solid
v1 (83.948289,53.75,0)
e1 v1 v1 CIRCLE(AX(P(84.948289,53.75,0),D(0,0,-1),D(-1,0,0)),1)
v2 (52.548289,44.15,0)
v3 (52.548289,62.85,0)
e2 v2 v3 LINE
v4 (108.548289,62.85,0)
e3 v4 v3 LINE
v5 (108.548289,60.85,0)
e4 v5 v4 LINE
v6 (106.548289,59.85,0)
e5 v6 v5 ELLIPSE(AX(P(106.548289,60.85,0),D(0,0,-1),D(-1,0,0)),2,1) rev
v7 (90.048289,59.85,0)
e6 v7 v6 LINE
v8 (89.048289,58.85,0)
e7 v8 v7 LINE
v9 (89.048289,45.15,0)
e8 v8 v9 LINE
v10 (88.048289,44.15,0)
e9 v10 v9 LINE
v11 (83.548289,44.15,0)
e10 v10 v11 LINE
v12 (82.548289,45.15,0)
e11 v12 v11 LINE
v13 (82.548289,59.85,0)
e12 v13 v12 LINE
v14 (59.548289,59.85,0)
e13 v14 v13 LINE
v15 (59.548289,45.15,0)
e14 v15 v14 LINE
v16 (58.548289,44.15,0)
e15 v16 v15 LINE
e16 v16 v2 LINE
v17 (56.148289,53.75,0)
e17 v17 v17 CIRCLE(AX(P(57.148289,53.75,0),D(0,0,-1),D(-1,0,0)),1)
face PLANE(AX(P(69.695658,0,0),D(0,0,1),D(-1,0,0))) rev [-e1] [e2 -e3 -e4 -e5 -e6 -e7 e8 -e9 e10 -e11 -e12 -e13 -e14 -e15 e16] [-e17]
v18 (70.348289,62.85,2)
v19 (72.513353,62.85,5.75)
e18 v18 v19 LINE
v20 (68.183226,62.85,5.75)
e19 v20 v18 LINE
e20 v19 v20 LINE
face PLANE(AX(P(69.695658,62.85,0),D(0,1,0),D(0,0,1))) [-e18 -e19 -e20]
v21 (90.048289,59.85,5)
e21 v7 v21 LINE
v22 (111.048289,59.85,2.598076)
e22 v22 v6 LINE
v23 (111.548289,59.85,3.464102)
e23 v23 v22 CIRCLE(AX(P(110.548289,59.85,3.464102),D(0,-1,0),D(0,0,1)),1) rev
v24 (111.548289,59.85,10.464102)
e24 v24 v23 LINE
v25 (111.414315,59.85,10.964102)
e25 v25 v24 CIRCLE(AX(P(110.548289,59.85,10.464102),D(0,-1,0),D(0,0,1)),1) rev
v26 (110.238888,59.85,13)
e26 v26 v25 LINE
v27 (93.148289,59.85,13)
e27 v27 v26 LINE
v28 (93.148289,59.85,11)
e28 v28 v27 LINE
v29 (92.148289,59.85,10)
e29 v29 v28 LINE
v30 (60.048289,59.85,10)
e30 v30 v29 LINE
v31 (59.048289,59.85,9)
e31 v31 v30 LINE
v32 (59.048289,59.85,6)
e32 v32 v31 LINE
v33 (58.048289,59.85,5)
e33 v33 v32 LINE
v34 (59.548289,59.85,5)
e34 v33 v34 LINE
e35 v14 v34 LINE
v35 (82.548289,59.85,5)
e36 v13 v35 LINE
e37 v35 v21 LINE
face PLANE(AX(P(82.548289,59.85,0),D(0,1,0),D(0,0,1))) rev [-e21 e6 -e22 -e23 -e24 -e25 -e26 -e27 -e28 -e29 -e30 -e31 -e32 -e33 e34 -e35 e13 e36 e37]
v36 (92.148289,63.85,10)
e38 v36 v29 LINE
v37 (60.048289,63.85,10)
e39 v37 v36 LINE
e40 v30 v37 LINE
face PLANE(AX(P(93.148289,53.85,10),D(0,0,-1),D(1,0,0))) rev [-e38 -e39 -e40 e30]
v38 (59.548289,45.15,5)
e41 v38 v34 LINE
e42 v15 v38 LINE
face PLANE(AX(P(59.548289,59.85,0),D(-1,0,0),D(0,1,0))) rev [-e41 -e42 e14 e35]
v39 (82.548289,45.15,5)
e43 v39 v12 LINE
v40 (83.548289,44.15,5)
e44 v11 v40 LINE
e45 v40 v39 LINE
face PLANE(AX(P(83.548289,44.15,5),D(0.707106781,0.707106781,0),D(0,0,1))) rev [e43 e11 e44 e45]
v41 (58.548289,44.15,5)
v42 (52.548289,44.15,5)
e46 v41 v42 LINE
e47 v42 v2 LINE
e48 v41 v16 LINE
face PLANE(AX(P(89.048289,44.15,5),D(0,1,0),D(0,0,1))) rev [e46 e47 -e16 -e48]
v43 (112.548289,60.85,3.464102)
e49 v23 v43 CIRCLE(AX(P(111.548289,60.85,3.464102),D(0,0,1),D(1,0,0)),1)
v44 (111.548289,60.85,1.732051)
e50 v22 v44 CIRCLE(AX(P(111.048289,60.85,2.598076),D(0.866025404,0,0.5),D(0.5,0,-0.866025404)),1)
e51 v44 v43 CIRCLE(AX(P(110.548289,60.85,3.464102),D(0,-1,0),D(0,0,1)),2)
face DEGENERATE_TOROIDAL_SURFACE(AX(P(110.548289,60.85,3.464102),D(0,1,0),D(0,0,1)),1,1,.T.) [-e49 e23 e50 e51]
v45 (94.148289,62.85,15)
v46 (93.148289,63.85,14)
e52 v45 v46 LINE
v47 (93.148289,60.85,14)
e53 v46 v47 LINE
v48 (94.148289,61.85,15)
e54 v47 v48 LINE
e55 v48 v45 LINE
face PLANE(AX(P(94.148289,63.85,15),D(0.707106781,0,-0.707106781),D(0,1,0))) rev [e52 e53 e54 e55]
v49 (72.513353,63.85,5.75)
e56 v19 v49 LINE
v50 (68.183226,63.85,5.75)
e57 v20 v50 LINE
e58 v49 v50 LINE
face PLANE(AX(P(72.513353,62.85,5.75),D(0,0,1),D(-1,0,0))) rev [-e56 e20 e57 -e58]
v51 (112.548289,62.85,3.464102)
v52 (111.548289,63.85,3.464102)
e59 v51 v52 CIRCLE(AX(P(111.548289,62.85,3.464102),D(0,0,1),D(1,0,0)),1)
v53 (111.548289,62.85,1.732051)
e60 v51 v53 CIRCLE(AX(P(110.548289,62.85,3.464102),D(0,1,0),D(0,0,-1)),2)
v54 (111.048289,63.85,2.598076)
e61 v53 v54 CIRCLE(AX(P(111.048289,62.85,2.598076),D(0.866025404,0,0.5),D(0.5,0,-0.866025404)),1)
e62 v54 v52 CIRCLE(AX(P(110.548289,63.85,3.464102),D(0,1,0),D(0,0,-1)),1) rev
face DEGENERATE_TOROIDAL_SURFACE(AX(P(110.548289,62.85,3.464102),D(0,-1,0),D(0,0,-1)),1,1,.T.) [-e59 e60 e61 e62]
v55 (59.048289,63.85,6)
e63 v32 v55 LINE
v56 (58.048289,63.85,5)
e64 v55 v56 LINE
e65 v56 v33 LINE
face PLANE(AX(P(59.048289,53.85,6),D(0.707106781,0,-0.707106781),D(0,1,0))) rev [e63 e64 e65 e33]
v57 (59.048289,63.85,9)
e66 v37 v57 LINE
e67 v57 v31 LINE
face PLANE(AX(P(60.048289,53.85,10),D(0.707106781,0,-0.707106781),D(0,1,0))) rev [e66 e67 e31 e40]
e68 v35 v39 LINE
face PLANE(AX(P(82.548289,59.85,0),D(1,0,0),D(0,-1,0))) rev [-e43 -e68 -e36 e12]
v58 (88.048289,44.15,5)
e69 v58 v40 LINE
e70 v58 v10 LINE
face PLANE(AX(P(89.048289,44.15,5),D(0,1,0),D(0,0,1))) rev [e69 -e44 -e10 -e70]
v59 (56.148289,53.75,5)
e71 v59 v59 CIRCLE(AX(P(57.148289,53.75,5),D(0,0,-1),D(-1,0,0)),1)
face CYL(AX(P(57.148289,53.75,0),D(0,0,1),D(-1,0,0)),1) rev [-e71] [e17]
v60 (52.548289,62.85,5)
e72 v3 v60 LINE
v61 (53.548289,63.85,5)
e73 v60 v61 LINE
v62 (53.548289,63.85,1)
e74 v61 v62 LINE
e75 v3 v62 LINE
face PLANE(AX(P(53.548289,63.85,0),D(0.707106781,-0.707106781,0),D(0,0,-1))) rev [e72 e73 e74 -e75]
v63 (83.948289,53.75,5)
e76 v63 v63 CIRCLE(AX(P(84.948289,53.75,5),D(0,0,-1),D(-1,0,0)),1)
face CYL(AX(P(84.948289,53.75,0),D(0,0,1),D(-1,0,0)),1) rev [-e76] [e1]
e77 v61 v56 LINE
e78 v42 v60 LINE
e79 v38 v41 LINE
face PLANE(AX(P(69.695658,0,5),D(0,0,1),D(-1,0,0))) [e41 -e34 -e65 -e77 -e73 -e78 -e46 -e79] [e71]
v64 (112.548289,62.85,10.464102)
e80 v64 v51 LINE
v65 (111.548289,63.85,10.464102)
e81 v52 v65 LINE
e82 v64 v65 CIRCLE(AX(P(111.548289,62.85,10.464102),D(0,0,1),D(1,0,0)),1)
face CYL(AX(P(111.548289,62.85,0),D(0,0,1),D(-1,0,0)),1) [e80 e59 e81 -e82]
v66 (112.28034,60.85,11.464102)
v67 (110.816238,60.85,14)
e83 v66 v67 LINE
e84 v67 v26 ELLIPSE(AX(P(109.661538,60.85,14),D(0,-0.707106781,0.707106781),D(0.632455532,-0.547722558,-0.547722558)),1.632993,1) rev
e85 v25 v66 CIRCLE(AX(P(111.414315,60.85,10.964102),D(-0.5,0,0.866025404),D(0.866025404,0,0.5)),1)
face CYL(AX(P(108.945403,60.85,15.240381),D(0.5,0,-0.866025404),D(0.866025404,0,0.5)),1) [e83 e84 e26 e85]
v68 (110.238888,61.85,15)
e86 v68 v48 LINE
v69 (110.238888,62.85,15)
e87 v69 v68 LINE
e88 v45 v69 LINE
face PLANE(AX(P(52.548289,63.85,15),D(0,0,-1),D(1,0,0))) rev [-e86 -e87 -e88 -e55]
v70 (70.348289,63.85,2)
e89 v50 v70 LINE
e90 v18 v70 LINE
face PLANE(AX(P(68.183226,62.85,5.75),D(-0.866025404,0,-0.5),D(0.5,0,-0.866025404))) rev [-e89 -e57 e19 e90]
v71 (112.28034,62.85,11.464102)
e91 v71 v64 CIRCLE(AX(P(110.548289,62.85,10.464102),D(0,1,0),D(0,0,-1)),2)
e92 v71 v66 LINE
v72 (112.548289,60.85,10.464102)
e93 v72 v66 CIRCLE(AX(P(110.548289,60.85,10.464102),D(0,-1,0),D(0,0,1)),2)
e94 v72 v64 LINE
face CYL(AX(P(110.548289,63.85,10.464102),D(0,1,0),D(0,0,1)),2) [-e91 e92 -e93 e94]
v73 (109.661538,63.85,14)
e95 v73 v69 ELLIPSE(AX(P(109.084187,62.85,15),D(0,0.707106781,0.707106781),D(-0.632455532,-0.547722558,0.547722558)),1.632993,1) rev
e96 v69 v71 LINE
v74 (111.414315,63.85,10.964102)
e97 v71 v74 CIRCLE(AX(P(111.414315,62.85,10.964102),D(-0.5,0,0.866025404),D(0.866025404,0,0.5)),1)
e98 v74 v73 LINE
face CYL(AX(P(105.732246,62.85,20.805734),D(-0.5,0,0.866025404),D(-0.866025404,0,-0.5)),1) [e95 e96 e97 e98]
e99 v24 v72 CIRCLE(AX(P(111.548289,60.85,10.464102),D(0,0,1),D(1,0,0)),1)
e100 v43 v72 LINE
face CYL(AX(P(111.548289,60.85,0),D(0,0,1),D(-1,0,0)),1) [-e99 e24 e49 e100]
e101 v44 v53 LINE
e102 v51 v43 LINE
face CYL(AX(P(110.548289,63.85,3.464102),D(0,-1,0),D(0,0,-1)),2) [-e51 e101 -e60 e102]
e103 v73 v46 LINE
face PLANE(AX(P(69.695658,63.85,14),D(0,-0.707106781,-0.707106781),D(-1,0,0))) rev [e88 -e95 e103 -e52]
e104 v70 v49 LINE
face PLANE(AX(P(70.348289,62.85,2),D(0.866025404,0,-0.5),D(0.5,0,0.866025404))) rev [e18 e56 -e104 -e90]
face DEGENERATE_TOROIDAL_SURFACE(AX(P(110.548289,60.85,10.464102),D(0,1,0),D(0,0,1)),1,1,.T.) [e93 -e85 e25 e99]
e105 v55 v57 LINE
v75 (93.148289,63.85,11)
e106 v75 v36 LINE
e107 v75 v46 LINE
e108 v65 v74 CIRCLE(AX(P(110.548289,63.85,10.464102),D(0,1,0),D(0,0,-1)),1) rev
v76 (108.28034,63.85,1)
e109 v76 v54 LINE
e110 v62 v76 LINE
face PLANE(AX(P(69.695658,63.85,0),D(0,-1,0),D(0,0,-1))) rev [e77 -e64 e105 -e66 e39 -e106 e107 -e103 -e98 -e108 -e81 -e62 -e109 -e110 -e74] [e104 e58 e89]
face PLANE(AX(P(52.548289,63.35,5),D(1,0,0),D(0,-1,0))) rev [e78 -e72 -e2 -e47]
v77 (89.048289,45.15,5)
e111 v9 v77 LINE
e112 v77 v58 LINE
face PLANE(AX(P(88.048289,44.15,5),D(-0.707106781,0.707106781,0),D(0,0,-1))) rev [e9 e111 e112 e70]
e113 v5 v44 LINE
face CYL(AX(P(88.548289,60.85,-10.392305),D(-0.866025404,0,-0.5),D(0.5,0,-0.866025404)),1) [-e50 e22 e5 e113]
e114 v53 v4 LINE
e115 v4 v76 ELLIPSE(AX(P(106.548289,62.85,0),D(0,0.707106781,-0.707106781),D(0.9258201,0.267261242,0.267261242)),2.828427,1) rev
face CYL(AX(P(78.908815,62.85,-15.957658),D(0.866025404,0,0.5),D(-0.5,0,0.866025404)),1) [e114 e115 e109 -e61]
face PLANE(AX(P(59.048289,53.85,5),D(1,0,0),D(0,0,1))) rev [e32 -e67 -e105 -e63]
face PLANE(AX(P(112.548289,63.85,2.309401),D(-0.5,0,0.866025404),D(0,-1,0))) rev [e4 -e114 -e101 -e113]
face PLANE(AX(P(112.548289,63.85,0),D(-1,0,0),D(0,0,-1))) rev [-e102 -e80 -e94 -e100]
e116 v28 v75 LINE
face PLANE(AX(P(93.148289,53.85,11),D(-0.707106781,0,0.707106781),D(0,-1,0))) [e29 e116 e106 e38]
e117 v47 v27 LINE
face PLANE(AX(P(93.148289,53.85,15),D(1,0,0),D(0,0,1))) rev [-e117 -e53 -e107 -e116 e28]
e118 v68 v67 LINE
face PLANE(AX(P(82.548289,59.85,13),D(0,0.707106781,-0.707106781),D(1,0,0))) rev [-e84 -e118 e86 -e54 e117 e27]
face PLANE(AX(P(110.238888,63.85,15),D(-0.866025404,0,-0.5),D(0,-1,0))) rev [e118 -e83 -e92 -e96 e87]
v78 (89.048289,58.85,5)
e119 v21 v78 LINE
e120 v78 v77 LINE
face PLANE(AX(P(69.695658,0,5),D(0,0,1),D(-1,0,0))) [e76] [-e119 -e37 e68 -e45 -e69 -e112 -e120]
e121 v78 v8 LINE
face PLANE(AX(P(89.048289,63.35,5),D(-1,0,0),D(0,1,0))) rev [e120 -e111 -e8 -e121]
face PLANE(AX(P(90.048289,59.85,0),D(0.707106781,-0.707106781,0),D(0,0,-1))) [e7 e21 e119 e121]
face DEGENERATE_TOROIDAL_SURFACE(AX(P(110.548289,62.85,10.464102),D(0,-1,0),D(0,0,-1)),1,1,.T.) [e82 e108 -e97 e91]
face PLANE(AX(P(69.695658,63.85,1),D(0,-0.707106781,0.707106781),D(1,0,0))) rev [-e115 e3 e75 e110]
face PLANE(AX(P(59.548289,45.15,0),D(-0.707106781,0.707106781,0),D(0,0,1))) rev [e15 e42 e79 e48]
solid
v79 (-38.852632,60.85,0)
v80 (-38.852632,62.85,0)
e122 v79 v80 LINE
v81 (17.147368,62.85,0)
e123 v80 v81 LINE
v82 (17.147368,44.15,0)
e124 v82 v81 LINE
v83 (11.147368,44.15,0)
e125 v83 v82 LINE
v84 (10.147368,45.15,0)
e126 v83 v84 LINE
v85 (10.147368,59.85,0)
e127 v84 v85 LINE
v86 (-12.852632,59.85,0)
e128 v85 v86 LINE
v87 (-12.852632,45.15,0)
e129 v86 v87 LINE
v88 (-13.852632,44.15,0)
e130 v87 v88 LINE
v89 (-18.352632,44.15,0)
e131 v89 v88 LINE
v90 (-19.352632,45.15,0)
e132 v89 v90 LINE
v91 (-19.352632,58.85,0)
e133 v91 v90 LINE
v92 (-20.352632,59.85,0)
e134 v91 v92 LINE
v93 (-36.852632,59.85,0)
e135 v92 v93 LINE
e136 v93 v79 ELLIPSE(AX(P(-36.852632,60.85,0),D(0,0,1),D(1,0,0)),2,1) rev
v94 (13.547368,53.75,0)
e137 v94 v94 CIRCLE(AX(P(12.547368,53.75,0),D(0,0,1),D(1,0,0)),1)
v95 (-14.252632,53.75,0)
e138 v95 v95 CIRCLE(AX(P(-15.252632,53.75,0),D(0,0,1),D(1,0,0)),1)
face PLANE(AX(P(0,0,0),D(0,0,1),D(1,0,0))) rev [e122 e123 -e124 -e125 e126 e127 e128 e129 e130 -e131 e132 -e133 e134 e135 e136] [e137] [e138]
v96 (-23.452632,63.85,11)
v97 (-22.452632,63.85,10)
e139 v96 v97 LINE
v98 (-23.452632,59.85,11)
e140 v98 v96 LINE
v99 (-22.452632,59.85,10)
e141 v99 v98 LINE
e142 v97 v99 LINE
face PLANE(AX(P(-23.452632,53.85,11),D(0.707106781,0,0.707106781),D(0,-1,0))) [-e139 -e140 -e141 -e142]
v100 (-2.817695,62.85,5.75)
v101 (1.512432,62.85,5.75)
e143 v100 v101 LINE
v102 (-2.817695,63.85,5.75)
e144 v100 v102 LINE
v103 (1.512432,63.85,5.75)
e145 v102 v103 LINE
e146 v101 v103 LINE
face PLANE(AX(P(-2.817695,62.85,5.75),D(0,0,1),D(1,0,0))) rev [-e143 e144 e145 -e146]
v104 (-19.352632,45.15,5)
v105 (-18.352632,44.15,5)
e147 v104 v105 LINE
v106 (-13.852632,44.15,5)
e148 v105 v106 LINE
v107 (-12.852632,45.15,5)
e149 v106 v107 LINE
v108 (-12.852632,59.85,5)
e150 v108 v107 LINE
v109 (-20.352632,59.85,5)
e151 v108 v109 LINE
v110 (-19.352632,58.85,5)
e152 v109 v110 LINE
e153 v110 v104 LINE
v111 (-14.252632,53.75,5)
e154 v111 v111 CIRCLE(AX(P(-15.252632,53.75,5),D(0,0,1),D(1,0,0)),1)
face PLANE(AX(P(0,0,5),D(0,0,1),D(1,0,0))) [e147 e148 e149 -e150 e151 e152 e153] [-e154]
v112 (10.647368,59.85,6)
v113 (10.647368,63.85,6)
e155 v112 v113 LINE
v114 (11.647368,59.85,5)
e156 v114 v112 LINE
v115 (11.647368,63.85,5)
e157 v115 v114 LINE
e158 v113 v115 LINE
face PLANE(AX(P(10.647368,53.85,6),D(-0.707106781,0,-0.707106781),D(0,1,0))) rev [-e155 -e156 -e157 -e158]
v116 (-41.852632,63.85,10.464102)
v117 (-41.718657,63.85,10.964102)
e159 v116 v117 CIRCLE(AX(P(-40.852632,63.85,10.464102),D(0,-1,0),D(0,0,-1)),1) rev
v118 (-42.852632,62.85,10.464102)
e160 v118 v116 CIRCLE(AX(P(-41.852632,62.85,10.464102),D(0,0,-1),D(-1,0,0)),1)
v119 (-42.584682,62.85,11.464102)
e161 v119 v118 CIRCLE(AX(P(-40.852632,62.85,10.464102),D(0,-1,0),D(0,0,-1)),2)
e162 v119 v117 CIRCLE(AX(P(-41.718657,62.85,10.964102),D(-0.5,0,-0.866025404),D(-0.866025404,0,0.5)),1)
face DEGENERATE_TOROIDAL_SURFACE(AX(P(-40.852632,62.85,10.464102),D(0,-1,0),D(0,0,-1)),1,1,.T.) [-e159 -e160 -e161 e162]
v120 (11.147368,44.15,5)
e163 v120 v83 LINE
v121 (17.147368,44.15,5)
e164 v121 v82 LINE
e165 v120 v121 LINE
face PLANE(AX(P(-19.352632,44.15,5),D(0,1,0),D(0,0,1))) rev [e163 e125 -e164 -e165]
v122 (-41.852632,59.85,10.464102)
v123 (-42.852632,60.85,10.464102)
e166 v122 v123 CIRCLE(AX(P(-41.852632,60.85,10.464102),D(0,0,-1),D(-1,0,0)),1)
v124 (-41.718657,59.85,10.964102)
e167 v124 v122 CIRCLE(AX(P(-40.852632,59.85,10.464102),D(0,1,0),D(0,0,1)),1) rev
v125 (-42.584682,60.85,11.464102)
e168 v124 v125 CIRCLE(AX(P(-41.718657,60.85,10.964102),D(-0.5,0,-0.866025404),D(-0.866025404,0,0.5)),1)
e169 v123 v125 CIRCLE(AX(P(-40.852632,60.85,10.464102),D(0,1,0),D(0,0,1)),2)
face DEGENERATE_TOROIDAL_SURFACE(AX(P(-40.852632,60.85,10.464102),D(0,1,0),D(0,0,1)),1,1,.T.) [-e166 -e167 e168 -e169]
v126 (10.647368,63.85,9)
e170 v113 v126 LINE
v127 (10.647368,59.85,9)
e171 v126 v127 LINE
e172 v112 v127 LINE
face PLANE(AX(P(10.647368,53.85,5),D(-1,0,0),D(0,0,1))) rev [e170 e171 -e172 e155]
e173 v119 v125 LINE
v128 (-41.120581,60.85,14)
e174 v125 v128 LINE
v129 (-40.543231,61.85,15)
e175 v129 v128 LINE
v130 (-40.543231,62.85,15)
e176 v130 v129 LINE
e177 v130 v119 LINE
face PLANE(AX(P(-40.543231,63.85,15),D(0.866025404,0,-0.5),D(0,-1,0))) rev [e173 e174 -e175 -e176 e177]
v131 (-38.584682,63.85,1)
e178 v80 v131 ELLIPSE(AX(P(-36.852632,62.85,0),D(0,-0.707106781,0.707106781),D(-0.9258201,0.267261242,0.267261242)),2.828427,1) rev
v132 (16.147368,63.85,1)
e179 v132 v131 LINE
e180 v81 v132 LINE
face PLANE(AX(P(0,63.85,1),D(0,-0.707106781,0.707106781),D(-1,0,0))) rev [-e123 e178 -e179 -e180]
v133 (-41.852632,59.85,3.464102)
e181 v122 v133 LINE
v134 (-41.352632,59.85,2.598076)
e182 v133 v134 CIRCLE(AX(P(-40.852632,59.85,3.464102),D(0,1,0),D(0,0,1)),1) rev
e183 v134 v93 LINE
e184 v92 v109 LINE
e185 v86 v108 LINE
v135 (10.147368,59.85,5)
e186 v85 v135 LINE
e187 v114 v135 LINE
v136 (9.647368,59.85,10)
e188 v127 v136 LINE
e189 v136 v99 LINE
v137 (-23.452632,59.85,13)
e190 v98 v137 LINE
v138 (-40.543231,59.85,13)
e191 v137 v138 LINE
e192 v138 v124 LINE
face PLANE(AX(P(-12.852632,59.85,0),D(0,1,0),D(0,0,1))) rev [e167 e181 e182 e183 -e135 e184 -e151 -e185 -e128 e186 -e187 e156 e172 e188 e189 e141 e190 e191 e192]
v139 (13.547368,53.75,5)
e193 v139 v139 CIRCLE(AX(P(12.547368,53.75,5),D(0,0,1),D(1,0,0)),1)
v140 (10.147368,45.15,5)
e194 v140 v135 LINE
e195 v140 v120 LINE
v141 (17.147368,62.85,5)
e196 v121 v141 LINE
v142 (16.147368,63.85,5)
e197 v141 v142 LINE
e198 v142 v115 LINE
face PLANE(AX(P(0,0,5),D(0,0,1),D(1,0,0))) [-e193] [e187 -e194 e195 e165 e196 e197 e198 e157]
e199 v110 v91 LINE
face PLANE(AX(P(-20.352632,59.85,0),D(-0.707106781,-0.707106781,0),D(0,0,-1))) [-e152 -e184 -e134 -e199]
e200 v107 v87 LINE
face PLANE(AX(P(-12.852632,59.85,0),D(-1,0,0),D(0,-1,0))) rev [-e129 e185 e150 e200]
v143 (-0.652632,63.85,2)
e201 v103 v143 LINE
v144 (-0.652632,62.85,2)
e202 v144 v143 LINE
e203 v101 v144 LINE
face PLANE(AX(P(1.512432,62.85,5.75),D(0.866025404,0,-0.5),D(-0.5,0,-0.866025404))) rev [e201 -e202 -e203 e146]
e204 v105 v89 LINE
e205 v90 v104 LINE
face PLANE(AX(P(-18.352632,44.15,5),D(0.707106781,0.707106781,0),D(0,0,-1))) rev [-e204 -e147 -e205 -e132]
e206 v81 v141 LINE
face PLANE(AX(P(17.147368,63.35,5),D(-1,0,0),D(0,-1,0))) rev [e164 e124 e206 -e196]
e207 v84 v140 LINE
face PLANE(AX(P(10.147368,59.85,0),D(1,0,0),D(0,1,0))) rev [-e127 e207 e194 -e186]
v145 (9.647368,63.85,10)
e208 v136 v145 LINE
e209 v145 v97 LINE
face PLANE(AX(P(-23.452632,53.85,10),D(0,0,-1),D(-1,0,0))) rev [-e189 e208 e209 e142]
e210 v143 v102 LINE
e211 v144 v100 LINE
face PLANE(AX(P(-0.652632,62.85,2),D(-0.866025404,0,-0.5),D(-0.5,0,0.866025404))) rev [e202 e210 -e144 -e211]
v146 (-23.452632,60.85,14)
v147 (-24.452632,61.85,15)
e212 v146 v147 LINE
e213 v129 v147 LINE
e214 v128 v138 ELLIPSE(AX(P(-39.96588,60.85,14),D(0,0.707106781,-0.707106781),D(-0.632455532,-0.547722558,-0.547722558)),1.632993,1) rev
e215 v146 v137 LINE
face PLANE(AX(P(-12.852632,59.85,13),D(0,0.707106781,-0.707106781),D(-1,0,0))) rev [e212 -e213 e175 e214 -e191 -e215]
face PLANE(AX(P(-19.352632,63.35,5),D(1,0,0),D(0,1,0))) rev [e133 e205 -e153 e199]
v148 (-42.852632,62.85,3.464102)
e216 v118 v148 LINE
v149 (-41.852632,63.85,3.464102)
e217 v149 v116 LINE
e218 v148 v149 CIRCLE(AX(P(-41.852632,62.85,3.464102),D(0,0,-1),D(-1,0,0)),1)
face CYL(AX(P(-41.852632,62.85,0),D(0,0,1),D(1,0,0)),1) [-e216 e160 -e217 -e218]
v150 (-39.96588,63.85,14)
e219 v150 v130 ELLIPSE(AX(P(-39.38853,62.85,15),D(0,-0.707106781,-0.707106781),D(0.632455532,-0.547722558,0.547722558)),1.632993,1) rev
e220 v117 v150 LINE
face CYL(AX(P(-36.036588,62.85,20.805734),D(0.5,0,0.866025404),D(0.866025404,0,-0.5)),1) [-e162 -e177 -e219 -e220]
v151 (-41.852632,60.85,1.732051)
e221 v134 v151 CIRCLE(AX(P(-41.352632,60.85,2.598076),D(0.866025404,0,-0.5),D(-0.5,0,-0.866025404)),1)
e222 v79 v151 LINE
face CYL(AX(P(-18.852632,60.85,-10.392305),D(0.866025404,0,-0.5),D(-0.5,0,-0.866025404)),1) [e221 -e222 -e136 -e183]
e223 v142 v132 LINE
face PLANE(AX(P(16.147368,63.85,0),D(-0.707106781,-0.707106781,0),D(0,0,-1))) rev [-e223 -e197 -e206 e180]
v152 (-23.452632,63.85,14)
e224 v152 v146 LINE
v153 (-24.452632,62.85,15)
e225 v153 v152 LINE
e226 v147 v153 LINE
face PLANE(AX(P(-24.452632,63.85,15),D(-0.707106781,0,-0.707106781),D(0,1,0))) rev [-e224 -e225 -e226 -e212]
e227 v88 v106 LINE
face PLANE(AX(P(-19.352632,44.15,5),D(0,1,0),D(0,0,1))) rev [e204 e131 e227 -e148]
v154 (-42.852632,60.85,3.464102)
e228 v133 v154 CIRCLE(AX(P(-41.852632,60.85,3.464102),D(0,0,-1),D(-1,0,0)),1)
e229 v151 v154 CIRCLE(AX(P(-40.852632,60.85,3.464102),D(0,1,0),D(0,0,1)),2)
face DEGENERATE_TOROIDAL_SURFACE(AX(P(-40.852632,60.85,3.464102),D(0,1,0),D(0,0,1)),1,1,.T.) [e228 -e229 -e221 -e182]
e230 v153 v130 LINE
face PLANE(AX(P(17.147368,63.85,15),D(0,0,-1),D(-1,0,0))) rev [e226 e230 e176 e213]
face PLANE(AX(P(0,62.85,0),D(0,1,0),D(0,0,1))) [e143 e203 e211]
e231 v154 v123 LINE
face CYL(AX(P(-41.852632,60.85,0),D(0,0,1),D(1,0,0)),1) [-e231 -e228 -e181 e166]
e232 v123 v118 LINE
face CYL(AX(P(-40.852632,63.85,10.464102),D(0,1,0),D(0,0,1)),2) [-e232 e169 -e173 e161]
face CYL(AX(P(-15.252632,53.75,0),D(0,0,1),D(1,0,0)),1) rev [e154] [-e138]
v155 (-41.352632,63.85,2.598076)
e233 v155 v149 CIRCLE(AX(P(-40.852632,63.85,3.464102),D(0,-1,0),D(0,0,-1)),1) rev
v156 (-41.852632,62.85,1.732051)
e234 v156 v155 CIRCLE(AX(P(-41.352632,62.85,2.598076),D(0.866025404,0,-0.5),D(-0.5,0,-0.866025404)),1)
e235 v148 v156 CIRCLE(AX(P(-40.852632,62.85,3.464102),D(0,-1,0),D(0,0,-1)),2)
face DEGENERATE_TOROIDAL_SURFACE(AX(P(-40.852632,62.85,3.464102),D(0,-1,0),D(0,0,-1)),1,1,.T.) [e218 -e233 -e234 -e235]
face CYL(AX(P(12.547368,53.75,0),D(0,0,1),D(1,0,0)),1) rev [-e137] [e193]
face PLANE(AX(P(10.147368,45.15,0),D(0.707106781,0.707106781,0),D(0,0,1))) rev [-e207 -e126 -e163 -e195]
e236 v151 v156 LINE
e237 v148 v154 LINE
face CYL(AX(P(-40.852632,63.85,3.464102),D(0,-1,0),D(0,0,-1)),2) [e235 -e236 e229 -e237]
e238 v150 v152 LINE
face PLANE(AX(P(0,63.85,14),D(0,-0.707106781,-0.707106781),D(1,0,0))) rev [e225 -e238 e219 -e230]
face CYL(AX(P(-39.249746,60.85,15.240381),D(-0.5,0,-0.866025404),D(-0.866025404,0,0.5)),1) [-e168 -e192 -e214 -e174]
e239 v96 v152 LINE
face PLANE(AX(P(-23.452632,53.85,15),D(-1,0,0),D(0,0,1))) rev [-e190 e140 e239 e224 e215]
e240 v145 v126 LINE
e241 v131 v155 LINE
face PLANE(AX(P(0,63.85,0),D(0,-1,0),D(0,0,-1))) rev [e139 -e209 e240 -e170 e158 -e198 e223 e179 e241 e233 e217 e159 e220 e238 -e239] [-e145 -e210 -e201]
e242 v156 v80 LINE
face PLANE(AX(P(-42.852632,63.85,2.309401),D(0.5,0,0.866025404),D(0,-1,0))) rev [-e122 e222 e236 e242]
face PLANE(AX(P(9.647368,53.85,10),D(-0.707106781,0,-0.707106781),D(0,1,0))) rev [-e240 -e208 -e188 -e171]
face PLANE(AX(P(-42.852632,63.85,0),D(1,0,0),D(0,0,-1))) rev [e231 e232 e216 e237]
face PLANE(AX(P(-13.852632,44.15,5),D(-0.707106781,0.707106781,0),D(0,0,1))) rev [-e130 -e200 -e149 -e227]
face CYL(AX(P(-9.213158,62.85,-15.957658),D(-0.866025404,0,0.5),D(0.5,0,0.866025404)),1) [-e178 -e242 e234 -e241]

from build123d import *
from OCP.BRepFilletAPI import BRepFilletAPI_MakeChamfer

# Parameters (mm, degrees)
SKETCH1_W           = 36.5
SKETCH1_H           = 19.2
BOSS_EXTRUDE1_DEPTH = 5
SKETCH2_R           = 1
SKETCH2_W           = 23
SKETCH2_H           = 15.7
CUT_EXTRUDE3_DEPTH  = 67.428509309
SKETCH4_W           = 60
SKETCH4_H           = 15
BOSS_EXTRUDE2_DEPTH = 0.5
BOSS_EXTRUDE3_DEPTH = 3.5
CHAMFER1_SIZE       = 2
CHAMFER2_SIZE       = 1
CHAMFER3_SIZE       = 4
CHAMFER3_SIZE2      = 2.309401077
FILLET1_R           = 2
CUT_EXTRUDE4_DEPTH  = 1
FILLET2_R           = 1
CUT_EXTRUDE5_DEPTH  = 10
CHAMFER4_SIZE       = 1


with BuildPart() as part:
    # Sketch1 → Boss-Extrude1 (new body)
    with BuildSketch(Plane.XY):
        with Locations((-1.102631579, 53.75)):
            Rectangle(SKETCH1_W, SKETCH1_H)
    extrude(amount=BOSS_EXTRUDE1_DEPTH)

    # Sketch2 → Cut-Extrude3 (cut, through all)
    with BuildSketch(Plane.XY.offset(5)):
        with Locations((-15.252631579, 53.75)):
            Circle(SKETCH2_R)
        with Locations((12.547368421, 53.75)):
            Circle(SKETCH2_R)
        with Locations((-1.352631579, 52)):
            Rectangle(SKETCH2_W, SKETCH2_H)
    extrude(amount=-CUT_EXTRUDE3_DEPTH, mode=Mode.SUBTRACT)

    # Sketch4 → Boss-Extrude2 (add)
    with BuildSketch(Plane(origin=(0, 63.35, 0), x_dir=(1, 0, 0), z_dir=(0, 1, 0))):
        with Locations((-12.852631579, -7.5)):
            Rectangle(SKETCH4_W, SKETCH4_H)
    extrude(amount=BOSS_EXTRUDE2_DEPTH)

    # Sketch7 → Boss-Extrude3 (add)
    with BuildSketch(Plane.XZ.offset(-63.35)):
        Polygon((-19.352631579, 0), (-42.852631579, 0), (-42.852631579, 15), (-19.052631579, 15), (17.147368421, 15), (17.147368421, 5), (-19.352631579, 5), align=None)
    extrude(amount=BOSS_EXTRUDE3_DEPTH)

    # Chamfer1
    chamfer1_edges = [part.edges().sort_by_distance(p)[0] for p in [
        (-12.852631579, 59.85, 15),
    ]]
    chamfer(chamfer1_edges, length=CHAMFER1_SIZE)

    # Chamfer2
    chamfer2_edges = [part.edges().sort_by_distance(p)[0] for p in [
        (-12.852631579, 44.15, 2.5),
        (10.147368421, 44.15, 2.5),
        (17.147368421, 63.85, 7.5),
        (-12.852631579, 63.85, 0),
        (-12.852631579, 63.85, 15),
        (-19.352631579, 59.85, 2.5),
        (-19.352631579, 44.15, 2.5),
    ]]
    chamfer(chamfer2_edges, length=CHAMFER2_SIZE)

    # Chamfer3: one chamfer whose edges measure the first distance from different faces: ONE call of the kernel's chamfer builder (chamfer() names one face for all edges)
    chamfer3_edges_1 = [part.edges().sort_by_distance(p)[0] for p in [
        (-42.852631579, 61.35, 0),
    ]]
    chamfer3_side_1 = [part.faces().sort_by_distance(p)[0] for p in [
        (-18.724165987, 52, 0),
    ]]
    chamfer3_edges_2 = [part.edges().sort_by_distance(p)[0] for p in [
        (-42.852631579, 62.35, 15),
    ]]
    chamfer3_side_2 = [part.faces().sort_by_distance(p)[0] for p in [
        (-42.852631579, 61.86754386, 7.260233918),
    ]]
    chamfer3 = BRepFilletAPI_MakeChamfer(part.part.solid().wrapped)
    for e in chamfer3_edges_1:
        chamfer3.Add(CHAMFER3_SIZE, CHAMFER3_SIZE2, e.wrapped, chamfer3_side_1[0].wrapped)  # the first distance lies on this face
    for e in chamfer3_edges_2:
        chamfer3.Add(CHAMFER3_SIZE, CHAMFER3_SIZE2, e.wrapped, chamfer3_side_2[0].wrapped)  # the first distance lies on this face
    add(Compound.cast(chamfer3.Shape()), mode=Mode.REPLACE)

    # Fillet1
    fillet1_edges = [part.edges().sort_by_distance(p)[0] for p in [
        (-42.852631579, 61.85, 11),
        (-42.852631579, 61.85, 2.309401077),
    ]]
    fillet(fillet1_edges, radius=FILLET1_R)

    # Sketch8 → Cut-Extrude4 (cut)
    with BuildSketch(Plane(origin=(0, 63.85, 0), x_dir=(1, 0, 0), z_dir=(0, 1, 0))):
        Polygon((-0.652631579, -2), (-2.817695088, -5.75), (1.512431931, -5.75), align=None)
    extrude(amount=-CUT_EXTRUDE4_DEPTH, mode=Mode.SUBTRACT)

    # Fillet2
    fillet2_edges = [part.edges().sort_by_distance(p)[0] for p in [
        (-41.218656983, 63.85, 1.366025404),
        (-42.584682387, 63.85, 2.464101615),
        (-41.852631579, 63.85, 12.732050808),
        (-42.784483232, 63.85, 10.981739705),
        (-40.352631579, 59.85, 0.866025404),
        (-42.584682387, 59.85, 2.464101615),
        (-42.141306714, 59.85, 12.232050808),
        (-42.784483232, 59.85, 10.981739705),
        (-42.852631579, 63.85, 6.964101615),
        (-42.852631579, 59.85, 6.964101615),
    ]]
    fillet(fillet2_edges, radius=FILLET2_R - 0.0001)  # a hair under: the kernel refuses the full size

    # Sketch9 → Cut-Extrude5 (cut)
    with BuildSketch(Plane(origin=(0, 63.85, 0), x_dir=(1, 0, 0), z_dir=(0, 1, 0))):
        Polygon((17.147368421, -5), (10.647368421, -5), (10.647368421, -10), (-23.452631579, -10), (-23.452631579, -15), (9.647368421, -15), (17.147368421, -15), align=None)
    extrude(amount=-CUT_EXTRUDE5_DEPTH, mode=Mode.SUBTRACT)

    # Chamfer4
    chamfer4_edges = [part.edges().sort_by_distance(p)[0] for p in [
        (10.647368421, 61.85, 5),
        (-23.452631579, 61.85, 10),
        (10.647368421, 61.85, 10),
        (-23.452631579, 62.35, 15),
    ]]
    chamfer(chamfer4_edges, length=CHAMFER4_SIZE)


with BuildPart() as body_2:
    # Mirror1: mirrored copy
    add(part.part.mirror(Plane.ZY.offset(-34.84782876)))


solid = Compound([part.part, body_2.part])
